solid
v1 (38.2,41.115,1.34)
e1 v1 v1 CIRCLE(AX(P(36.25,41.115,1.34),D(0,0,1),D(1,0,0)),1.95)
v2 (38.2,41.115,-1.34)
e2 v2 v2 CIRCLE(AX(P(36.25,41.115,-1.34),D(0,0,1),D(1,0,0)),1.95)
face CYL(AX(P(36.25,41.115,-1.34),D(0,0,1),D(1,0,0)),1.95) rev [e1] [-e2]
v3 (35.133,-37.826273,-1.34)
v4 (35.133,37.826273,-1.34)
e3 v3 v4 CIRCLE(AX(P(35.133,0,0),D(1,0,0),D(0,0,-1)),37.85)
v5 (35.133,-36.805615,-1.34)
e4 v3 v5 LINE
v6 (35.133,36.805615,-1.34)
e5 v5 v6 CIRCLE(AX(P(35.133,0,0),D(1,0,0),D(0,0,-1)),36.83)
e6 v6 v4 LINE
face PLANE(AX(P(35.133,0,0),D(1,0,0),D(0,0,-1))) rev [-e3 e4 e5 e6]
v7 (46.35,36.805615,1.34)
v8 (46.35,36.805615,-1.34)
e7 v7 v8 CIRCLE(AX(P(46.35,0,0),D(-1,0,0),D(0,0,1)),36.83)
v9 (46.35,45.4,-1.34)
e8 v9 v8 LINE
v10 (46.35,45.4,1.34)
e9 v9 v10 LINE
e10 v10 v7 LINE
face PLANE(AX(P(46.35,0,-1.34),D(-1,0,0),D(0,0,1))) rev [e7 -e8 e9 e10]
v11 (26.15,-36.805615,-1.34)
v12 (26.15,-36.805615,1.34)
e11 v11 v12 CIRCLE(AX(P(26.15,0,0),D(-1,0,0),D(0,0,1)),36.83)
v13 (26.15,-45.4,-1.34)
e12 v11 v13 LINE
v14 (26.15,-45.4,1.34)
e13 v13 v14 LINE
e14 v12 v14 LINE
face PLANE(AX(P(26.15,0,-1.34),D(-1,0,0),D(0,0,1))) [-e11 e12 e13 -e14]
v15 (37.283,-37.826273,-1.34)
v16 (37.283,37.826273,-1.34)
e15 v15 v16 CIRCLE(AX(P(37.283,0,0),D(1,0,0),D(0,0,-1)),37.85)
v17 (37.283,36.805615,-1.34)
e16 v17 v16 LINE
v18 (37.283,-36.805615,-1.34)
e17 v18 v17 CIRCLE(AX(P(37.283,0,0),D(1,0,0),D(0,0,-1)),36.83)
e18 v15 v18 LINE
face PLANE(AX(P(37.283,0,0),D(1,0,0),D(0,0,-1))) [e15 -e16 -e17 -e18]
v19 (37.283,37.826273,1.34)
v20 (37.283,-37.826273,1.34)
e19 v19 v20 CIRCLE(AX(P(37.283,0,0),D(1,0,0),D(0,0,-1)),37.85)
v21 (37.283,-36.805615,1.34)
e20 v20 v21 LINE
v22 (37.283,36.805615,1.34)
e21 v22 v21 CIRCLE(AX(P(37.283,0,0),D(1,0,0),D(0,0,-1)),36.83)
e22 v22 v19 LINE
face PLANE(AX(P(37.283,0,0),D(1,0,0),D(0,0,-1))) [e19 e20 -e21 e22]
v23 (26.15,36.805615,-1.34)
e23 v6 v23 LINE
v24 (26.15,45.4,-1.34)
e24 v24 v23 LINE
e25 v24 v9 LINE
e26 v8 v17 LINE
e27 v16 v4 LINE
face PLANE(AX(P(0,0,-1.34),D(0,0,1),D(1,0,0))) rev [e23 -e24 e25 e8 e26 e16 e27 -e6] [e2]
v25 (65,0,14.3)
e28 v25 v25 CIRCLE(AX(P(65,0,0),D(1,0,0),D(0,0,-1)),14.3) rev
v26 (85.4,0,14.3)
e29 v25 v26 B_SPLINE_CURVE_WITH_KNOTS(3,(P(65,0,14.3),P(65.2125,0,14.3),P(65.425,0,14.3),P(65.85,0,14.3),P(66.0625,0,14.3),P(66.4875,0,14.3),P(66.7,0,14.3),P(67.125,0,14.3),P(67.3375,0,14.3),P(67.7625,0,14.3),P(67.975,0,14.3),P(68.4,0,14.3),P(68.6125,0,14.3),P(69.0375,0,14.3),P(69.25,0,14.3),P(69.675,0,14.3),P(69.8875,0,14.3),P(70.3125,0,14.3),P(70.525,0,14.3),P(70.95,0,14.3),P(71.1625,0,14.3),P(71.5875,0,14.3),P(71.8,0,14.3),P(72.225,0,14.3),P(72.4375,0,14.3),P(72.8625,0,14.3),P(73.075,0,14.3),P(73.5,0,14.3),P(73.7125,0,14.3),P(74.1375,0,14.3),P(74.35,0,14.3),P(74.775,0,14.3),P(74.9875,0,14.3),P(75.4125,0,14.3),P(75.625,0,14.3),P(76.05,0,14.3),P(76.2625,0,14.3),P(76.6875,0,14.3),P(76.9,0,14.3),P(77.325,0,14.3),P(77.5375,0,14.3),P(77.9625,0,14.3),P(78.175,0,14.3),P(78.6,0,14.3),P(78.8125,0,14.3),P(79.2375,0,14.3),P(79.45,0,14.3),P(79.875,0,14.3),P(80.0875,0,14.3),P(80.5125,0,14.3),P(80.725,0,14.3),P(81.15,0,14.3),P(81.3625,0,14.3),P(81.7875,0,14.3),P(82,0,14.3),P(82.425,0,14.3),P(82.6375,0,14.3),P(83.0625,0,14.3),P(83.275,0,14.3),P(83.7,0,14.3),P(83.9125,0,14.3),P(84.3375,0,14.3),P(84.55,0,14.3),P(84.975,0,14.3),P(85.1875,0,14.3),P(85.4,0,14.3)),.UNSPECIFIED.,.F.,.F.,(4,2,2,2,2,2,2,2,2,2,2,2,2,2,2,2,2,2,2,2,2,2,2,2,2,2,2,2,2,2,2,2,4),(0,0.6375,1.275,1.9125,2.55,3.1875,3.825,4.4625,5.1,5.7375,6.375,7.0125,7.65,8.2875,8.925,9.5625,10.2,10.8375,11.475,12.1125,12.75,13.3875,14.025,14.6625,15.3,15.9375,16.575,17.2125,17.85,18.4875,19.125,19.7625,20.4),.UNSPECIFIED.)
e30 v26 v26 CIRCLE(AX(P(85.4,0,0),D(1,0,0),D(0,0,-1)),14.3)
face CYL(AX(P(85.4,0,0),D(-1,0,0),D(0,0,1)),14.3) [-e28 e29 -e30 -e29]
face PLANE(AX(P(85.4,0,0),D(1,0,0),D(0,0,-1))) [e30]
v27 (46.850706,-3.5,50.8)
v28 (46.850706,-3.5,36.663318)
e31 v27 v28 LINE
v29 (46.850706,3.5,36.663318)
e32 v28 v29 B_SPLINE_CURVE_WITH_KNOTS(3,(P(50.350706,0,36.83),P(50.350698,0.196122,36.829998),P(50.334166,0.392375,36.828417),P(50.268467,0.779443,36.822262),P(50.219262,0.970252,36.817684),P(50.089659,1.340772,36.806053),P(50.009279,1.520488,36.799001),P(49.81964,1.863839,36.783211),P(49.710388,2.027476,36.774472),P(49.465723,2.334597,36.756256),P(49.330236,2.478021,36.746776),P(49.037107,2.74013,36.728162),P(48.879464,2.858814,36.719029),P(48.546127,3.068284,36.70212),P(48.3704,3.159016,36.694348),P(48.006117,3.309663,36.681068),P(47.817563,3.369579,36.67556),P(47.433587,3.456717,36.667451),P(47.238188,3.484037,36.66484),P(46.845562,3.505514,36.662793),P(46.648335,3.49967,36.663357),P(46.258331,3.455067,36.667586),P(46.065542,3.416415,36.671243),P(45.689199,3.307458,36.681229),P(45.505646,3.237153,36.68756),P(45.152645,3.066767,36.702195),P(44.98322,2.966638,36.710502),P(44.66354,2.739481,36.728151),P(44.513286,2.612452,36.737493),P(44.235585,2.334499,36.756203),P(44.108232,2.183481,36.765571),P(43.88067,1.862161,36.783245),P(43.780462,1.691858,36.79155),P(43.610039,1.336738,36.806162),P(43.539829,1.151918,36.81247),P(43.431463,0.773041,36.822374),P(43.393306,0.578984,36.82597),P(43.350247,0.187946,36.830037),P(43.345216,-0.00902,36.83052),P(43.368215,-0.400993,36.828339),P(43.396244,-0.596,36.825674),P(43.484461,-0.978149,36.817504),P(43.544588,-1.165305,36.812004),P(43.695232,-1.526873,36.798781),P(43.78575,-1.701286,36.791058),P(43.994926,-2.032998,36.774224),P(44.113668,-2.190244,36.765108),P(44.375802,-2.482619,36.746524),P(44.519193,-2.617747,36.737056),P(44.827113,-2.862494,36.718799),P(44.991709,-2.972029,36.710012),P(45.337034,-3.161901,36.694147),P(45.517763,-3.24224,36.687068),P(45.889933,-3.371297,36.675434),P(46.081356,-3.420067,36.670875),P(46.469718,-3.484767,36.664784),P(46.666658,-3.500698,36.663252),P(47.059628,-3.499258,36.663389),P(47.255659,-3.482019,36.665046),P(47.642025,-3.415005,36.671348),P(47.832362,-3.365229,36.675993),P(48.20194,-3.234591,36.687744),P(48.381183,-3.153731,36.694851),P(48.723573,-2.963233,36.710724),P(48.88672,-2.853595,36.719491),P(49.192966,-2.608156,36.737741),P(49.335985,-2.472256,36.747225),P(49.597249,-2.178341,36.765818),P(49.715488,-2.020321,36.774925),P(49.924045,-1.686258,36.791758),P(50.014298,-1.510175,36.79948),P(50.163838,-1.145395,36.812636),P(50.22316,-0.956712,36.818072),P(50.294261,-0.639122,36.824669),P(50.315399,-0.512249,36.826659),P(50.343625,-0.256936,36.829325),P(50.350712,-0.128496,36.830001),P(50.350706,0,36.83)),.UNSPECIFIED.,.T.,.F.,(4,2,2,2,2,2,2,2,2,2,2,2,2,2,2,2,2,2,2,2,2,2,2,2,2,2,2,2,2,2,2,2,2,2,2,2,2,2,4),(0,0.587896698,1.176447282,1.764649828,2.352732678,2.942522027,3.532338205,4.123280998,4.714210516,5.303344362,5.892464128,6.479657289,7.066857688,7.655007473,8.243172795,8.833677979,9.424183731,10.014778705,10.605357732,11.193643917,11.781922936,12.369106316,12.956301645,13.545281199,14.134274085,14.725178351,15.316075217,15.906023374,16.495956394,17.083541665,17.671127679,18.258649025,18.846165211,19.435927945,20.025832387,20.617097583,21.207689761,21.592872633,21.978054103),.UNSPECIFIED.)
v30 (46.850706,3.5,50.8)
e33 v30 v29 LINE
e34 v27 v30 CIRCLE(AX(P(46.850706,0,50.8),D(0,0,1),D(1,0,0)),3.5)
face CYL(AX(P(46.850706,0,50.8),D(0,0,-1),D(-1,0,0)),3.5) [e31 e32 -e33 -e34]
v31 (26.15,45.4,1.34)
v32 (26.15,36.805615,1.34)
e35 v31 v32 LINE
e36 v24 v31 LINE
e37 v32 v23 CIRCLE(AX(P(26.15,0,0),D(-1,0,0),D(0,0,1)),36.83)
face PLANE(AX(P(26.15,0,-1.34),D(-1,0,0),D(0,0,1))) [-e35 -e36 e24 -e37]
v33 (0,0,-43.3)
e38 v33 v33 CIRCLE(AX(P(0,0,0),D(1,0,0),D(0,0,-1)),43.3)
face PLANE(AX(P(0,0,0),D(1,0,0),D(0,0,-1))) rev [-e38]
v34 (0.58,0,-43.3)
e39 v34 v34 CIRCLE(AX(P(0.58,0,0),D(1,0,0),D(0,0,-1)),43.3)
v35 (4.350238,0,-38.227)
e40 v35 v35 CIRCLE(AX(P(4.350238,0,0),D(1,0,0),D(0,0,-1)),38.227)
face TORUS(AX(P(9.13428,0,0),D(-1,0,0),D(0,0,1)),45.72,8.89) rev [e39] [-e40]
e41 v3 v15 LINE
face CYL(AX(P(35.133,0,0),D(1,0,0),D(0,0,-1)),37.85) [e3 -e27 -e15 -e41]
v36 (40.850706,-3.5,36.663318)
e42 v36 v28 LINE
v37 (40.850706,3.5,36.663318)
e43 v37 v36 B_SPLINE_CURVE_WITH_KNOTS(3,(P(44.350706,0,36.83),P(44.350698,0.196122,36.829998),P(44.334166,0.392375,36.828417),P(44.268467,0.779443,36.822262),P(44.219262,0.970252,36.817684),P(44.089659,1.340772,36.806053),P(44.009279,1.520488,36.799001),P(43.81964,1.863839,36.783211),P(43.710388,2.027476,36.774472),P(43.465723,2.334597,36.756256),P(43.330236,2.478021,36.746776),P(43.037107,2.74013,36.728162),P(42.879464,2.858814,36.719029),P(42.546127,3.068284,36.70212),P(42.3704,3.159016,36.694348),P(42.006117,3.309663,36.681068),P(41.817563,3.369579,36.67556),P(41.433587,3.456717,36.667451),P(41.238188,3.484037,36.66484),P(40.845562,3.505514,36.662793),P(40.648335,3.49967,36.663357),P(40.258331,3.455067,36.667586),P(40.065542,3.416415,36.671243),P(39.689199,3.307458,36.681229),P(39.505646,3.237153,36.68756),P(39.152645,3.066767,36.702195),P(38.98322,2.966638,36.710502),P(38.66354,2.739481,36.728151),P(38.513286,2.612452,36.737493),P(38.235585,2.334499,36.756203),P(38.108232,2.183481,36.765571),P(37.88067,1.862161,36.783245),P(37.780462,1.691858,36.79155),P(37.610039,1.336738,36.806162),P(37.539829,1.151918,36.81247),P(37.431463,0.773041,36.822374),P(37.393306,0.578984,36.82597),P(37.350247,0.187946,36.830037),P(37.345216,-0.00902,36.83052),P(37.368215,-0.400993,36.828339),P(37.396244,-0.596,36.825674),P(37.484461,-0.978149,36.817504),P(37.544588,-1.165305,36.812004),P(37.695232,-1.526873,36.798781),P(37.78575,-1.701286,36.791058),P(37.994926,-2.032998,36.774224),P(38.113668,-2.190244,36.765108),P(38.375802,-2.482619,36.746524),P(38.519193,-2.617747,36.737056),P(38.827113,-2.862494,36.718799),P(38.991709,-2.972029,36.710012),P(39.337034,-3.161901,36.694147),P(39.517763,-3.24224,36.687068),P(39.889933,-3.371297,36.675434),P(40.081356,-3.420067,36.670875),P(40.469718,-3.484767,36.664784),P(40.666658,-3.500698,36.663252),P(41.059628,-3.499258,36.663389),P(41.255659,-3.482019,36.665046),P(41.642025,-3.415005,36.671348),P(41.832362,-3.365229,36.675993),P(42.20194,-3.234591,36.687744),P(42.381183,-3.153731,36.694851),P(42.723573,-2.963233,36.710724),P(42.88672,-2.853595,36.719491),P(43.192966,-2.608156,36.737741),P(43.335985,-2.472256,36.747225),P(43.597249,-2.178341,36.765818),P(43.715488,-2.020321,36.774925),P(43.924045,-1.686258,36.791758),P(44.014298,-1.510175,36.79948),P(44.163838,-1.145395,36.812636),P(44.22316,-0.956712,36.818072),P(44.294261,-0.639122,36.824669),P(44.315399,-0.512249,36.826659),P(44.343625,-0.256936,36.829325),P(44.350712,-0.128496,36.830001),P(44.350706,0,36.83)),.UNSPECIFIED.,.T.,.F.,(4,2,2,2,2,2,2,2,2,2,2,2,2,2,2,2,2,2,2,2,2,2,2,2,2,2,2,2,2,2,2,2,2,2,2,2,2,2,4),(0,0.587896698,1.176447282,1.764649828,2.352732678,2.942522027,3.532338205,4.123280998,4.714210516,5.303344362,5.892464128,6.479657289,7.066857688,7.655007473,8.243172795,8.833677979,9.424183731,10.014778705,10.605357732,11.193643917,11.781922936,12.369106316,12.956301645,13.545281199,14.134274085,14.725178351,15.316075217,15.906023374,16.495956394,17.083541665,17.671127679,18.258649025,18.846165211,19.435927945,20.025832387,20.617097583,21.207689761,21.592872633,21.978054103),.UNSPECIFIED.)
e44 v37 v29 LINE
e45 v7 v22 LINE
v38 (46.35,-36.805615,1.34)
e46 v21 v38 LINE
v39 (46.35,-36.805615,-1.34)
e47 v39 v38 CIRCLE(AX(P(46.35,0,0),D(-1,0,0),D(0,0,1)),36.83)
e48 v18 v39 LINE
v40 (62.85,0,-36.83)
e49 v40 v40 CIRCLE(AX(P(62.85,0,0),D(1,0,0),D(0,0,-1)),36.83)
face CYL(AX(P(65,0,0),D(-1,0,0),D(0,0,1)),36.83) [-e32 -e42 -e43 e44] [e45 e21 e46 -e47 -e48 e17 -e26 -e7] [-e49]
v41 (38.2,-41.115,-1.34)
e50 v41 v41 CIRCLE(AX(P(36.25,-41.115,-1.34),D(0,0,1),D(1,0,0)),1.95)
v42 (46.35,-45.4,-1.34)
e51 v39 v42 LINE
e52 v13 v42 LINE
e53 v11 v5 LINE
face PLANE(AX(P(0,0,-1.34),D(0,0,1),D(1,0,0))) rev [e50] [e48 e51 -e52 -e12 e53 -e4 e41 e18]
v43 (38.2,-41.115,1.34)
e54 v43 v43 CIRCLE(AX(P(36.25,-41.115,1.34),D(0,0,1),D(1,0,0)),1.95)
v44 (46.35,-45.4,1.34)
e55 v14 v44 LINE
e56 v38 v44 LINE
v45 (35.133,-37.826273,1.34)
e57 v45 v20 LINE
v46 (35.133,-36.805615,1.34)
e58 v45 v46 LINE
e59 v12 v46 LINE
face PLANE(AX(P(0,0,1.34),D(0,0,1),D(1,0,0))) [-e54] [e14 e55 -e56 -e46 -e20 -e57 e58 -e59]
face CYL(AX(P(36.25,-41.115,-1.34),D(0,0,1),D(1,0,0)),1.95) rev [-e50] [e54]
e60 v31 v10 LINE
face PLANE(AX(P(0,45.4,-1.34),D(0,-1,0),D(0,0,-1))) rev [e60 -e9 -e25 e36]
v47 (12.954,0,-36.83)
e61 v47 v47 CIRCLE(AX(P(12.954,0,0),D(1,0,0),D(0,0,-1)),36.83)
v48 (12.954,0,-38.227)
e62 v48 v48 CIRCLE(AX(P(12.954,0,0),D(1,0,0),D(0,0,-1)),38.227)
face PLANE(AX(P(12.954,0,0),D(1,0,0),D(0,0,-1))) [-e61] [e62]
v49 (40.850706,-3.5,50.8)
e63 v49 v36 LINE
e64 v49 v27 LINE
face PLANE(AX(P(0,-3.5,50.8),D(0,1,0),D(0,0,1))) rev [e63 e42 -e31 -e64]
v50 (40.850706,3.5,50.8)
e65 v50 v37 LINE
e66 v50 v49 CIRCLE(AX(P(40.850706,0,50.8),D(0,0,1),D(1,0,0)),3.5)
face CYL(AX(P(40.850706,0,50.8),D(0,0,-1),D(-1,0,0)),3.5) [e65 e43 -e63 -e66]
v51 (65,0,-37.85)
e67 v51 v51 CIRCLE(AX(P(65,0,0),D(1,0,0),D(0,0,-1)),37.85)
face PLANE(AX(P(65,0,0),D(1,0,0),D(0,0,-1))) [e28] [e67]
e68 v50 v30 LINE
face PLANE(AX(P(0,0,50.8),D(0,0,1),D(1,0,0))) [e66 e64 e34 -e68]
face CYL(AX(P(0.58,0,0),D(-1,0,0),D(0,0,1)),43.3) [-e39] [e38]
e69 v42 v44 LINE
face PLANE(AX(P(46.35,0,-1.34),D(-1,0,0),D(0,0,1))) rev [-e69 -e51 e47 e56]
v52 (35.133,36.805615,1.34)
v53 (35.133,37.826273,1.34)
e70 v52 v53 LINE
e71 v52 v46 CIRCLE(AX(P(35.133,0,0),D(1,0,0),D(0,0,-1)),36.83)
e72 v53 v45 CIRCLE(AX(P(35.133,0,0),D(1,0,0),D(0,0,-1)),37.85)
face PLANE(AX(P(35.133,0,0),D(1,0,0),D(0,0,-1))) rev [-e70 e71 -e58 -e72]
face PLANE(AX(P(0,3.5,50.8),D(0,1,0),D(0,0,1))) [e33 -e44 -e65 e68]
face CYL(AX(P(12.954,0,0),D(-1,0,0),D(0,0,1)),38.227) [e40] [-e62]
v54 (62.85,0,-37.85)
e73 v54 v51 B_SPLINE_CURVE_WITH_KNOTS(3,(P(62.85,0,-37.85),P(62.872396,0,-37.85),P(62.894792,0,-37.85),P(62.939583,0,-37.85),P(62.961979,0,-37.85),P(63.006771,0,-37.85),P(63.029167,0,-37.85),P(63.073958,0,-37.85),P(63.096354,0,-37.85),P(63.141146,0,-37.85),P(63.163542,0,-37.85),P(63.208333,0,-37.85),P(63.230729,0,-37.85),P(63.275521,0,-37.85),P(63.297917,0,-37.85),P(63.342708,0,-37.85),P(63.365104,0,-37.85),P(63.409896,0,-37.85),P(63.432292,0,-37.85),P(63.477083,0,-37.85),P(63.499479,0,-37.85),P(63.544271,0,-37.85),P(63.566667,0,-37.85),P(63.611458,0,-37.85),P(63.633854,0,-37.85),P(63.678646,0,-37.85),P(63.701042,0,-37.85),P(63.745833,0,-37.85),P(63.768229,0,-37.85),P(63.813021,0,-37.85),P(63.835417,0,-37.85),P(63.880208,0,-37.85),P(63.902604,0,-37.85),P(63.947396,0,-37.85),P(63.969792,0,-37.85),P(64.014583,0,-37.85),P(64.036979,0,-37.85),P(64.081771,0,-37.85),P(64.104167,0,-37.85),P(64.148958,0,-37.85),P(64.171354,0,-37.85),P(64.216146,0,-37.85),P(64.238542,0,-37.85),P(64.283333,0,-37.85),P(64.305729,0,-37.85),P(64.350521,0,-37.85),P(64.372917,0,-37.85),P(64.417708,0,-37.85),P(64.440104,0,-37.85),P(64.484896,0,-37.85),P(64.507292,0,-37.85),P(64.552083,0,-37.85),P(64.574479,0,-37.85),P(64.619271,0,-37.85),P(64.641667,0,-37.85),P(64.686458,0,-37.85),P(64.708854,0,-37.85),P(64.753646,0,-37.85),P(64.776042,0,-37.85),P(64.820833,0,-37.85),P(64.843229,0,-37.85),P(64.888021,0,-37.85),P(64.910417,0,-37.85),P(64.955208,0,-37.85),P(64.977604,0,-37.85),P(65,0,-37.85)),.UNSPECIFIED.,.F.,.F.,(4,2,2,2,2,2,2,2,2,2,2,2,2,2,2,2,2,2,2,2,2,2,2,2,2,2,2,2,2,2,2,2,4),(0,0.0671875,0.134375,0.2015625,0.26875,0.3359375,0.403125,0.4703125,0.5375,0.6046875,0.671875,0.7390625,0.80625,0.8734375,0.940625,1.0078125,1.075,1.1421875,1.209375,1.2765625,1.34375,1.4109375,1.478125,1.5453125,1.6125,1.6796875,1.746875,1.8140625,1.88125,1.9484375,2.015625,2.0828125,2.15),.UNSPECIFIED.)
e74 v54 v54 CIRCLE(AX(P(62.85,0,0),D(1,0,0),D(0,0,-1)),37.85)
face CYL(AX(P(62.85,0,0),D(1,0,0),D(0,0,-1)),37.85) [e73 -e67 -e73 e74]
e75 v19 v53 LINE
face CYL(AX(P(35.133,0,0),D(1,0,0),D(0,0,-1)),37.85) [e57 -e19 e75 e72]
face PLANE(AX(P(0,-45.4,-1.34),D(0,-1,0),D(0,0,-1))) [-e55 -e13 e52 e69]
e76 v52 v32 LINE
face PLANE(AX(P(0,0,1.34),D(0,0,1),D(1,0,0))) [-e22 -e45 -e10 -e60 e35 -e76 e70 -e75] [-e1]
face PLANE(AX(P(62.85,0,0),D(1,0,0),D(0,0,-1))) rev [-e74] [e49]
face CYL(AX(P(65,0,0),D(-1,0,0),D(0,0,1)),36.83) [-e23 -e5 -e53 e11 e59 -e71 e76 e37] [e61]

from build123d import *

# Parameters (mm, degrees)
SKETCH1_R                = 43.3
BOSS_EXTRUDE1_DEPTH      = 0.58
BOSS_EXTRUDE2_START      = -0.58
SKETCH2_R                = 36.83
BOSS_EXTRUDE2_DEPTH      = 65
BOSS_EXTRUDE3_DEPTH      = 1.34
BOSS_EXTRUDE3_DEPTH_BACK = 1.34
SKETCH3_W                = 20.2
SKETCH3_H                = 90.8
SKETCH3_R                = 1.95
BOSS_EXTRUDE4_START      = 64.42
SKETCH4_R                = 37.849999992
BOSS_EXTRUDE4_DEPTH      = 2.15
BOSS_EXTRUDE5_START      = 36.703
SKETCH4_2_R              = 37.849999992
BOSS_EXTRUDE5_DEPTH      = 2.15
BOSS_EXTRUDE6_START      = -65
SKETCH5_R                = 14.299999975
BOSS_EXTRUDE6_DEPTH      = 85.4
BOSS_EXTRUDE7_DEPTH      = 50.8
FILLET1_R                = 8.89
BOSS_EXTRUDE8_START      = -65
SKETCH6_R                = 38.227
BOSS_EXTRUDE8_DEPTH      = 12.954


with BuildPart() as part:
    # Sketch1 → Boss-Extrude1 (new body)
    with BuildSketch(Plane(origin=(0, 0, 0), x_dir=(0, 0, -1), z_dir=(1, 0, 0))):
        Circle(SKETCH1_R)
    extrude(amount=BOSS_EXTRUDE1_DEPTH)

    # Sketch2 → Boss-Extrude2 (add)
    with BuildSketch(Plane(origin=(0.58, 0, 0), x_dir=(0, 0, -1), z_dir=(1, 0, 0)).offset(BOSS_EXTRUDE2_START)):
        Circle(SKETCH2_R)
    extrude(amount=BOSS_EXTRUDE2_DEPTH)

    # Sketch3 → Boss-Extrude3 (add, two sides: drawn at the far end of the back side and taken through both)
    with BuildSketch(Plane.XY.offset(-BOSS_EXTRUDE3_DEPTH_BACK)):
        with Locations((36.25, 0)):
            Rectangle(SKETCH3_W, SKETCH3_H)
        with Locations((36.25, 41.115)):
            Circle(SKETCH3_R, mode=Mode.SUBTRACT)
        with Locations((36.25, -41.115)):
            Circle(SKETCH3_R, mode=Mode.SUBTRACT)
    extrude(amount=BOSS_EXTRUDE3_DEPTH + BOSS_EXTRUDE3_DEPTH_BACK)

    # Sketch4 → Boss-Extrude4 (add)
    with BuildSketch(Plane(origin=(0.58, 0, 0), x_dir=(0, 0, -1), z_dir=(1, 0, 0)).offset(BOSS_EXTRUDE4_START)):
        Circle(SKETCH4_R)
    extrude(amount=-BOSS_EXTRUDE4_DEPTH)

    # Sketch4<2> → Boss-Extrude5 (add)
    with BuildSketch(Plane(origin=(0.58, 0, 0), x_dir=(0, 0, -1), z_dir=(1, 0, 0)).offset(BOSS_EXTRUDE5_START)):
        Circle(SKETCH4_2_R)
    extrude(amount=-BOSS_EXTRUDE5_DEPTH)

    # Sketch5 → Boss-Extrude6 (add)
    with BuildSketch(Plane(origin=(65, 0, 0), x_dir=(0, 0, -1), z_dir=(1, 0, 0)).offset(BOSS_EXTRUDE6_START)):
        with Locations(Location((0, 0, 0), (0, 0, 180))):
            Circle(SKETCH5_R)
    extrude(amount=BOSS_EXTRUDE6_DEPTH)

    # Sketch3<3> → Boss-Extrude7 (add)
    with BuildSketch(Plane.XY):
        with BuildLine():
            Line((40.850706358, 3.5), (46.850706358, 3.5))
            ThreePointArc((46.850706358, 3.5), (50.350706358, 0), (46.850706358, -3.5))
            Line((46.850706358, -3.5), (40.850706358, -3.5))
            ThreePointArc((40.850706358, -3.5), (37.350706358, 0), (40.850706358, 3.5))
        make_face()
    extrude(amount=BOSS_EXTRUDE7_DEPTH)

    # Fillet1
    # the kernel refuses this fillet: 8.89 mm, written as the material it adds along each edge
    with BuildSketch(Plane(origin=(0.58, 0, 0), x_dir=(0, 0, -1), z_dir=(0, 1, 0))) as fillet1_piece_1:
        with BuildLine():
            CenterArc((45.72, -8.554279631), FILLET1_R, 105.796172805, 74.203827195)
            Line((36.83, -8.554279631), (36.6522, -8.554279631))
            Line((36.6522, -8.554279631), (36.6522, 0))
            Line((36.6522, 0), (36.83, 0.1778))
            ThreePointArc((36.83, 0.1778), (40.065, 0.1778), (43.2516, 0.171085593))
            Line((43.2516, 0.171085593), (43.3, 0))
        make_face()
    revolve(axis=Axis((0.58, 0, 0), (-1, 0, 0)))

    # Sketch6 → Boss-Extrude8 (add)
    with BuildSketch(Plane(origin=(65, 0, 0), x_dir=(0, 0, -1), z_dir=(1, 0, 0)).offset(BOSS_EXTRUDE8_START)):
        Circle(SKETCH6_R)
    extrude(amount=BOSS_EXTRUDE8_DEPTH)


solid = part.part
